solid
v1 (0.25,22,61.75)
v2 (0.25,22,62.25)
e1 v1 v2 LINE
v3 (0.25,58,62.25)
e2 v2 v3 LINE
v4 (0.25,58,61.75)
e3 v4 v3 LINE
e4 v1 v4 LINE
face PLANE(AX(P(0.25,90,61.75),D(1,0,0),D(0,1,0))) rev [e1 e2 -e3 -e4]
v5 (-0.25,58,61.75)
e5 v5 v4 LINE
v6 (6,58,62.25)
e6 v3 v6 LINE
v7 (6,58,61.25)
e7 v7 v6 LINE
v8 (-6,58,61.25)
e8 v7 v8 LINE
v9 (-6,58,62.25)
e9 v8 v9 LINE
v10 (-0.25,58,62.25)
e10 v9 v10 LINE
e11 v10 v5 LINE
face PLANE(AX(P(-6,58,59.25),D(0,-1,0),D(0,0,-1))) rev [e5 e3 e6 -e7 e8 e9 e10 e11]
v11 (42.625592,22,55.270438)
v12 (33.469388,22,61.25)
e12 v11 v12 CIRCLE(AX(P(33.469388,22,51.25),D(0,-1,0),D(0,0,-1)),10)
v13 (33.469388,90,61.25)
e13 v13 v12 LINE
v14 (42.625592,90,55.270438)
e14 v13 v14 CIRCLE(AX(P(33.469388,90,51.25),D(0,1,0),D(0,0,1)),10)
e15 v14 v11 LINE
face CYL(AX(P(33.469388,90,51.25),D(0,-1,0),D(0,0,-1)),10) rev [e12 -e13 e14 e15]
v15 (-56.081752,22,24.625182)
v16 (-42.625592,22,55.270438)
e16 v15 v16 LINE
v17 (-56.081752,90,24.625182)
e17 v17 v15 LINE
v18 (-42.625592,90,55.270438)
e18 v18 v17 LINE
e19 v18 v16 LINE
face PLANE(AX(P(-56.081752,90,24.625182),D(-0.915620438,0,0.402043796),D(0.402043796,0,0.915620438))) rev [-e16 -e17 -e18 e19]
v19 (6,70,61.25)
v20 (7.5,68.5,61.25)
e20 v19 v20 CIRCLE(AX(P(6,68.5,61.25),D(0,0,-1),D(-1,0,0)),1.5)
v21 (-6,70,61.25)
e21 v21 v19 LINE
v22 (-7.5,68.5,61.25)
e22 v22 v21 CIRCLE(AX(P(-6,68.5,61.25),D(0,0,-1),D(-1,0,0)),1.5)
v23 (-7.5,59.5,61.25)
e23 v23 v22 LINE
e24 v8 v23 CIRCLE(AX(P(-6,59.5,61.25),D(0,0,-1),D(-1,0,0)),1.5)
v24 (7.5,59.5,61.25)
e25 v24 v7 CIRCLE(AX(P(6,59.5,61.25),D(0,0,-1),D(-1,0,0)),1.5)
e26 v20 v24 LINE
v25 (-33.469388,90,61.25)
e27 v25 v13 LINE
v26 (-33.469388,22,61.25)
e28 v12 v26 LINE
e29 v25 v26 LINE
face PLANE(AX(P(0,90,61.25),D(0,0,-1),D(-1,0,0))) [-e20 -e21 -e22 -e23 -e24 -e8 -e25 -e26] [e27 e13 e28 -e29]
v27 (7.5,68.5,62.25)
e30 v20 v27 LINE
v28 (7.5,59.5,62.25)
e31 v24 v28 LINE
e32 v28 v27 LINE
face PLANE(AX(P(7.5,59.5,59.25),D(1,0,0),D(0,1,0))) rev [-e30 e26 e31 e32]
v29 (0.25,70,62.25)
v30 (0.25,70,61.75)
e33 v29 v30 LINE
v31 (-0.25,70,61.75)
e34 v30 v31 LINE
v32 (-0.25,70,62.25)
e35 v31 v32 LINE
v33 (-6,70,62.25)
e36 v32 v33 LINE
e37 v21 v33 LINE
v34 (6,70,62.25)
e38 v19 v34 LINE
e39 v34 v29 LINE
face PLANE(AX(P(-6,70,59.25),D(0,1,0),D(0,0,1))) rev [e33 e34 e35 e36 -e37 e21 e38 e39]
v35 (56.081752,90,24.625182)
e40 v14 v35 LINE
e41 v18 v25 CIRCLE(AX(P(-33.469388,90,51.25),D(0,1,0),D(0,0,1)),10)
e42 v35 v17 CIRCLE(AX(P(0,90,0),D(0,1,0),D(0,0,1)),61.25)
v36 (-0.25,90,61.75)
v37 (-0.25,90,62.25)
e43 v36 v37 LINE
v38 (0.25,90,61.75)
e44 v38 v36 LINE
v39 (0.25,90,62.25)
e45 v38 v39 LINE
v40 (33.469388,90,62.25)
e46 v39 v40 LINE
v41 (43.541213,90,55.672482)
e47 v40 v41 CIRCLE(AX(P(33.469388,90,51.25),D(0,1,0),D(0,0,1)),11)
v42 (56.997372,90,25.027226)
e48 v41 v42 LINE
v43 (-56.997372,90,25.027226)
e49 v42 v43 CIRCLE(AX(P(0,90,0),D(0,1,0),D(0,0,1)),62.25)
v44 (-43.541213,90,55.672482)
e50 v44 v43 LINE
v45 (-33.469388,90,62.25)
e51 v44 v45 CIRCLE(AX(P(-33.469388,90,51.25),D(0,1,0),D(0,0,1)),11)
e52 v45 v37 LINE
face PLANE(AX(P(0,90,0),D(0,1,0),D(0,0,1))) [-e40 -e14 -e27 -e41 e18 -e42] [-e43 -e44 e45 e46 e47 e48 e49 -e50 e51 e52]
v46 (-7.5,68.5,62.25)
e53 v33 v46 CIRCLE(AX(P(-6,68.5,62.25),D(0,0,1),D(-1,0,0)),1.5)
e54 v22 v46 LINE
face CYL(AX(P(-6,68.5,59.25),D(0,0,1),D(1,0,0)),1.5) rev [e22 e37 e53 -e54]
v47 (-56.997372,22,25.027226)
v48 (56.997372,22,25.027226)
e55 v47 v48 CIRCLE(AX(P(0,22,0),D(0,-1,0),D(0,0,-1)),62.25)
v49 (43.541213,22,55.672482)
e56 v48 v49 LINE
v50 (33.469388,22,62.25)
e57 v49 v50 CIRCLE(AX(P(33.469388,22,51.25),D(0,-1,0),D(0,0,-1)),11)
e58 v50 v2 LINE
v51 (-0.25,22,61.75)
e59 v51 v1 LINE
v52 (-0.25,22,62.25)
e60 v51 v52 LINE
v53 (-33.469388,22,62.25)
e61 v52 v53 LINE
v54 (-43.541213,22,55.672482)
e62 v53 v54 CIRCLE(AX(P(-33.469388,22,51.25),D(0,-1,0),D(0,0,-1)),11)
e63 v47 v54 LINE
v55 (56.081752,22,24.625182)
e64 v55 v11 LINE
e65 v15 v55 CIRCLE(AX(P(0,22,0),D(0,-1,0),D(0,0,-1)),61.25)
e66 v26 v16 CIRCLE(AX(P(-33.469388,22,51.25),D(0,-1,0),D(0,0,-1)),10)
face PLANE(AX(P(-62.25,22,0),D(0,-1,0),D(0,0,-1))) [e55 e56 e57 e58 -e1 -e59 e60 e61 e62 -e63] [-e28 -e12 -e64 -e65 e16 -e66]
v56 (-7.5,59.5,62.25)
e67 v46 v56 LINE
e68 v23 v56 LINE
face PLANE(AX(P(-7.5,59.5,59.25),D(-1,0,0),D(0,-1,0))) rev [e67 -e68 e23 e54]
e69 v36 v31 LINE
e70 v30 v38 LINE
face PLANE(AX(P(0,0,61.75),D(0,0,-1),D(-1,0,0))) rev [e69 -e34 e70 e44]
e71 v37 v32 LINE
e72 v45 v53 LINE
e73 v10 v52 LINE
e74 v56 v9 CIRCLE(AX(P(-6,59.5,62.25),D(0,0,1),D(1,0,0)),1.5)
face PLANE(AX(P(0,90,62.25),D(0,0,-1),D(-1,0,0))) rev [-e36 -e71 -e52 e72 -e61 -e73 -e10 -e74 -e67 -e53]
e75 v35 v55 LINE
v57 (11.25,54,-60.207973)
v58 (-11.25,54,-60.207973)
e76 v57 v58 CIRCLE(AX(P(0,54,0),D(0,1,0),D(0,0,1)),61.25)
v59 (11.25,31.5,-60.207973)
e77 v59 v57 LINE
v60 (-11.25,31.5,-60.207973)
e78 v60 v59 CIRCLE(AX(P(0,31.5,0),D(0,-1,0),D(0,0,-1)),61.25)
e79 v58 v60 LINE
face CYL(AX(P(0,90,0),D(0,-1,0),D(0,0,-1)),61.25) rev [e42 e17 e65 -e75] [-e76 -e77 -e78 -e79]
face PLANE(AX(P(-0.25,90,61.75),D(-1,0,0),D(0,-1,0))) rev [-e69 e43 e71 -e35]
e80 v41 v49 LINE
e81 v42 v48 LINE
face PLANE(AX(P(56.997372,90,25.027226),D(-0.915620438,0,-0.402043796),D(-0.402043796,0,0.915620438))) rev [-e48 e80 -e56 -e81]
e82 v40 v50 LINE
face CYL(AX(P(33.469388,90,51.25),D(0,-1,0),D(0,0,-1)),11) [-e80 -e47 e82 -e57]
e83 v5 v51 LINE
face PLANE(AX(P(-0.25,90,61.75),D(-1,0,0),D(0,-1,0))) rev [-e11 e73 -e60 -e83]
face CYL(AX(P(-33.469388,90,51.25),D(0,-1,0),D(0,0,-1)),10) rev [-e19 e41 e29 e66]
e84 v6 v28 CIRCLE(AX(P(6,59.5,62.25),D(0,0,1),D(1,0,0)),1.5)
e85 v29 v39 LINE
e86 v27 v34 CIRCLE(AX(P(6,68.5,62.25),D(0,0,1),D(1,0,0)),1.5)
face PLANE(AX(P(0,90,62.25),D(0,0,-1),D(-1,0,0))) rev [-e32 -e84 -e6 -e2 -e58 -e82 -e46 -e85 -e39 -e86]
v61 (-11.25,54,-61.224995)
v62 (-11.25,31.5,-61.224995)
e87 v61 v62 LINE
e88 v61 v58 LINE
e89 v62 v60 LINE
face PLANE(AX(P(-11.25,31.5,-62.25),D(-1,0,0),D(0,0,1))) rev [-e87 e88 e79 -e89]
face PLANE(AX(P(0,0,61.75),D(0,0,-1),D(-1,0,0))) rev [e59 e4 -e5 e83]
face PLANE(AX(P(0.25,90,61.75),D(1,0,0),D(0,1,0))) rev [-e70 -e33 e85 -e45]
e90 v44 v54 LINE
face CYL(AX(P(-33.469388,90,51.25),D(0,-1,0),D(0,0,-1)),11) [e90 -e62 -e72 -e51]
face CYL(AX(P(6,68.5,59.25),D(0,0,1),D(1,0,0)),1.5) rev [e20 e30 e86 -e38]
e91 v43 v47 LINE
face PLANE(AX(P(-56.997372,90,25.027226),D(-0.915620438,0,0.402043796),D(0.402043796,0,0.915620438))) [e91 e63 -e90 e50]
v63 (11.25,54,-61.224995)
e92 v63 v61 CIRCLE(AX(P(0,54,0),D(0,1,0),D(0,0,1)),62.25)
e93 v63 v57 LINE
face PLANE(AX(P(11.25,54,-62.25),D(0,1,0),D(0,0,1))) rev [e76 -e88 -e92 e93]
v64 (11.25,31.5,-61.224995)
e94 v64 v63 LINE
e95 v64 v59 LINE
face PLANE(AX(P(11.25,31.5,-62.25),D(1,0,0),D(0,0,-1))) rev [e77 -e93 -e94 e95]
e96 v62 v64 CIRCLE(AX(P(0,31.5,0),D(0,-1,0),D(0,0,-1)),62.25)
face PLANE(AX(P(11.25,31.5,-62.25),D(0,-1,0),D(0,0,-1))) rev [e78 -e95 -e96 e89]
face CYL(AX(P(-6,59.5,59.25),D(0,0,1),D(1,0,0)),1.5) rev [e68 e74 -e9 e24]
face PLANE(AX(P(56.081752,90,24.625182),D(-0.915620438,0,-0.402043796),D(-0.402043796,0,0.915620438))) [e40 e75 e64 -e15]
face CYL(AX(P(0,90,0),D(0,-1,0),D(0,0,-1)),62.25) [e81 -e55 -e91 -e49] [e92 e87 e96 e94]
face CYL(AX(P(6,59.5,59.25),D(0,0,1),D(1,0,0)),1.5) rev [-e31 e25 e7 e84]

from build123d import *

# Parameters (mm, degrees)
BOSS_EXTRUDE1_DEPTH = 90
CUT_EXTRUDE1_DEPTH  = 22
SKETCH4_W           = 22.5
SKETCH4_H           = 22.5
CUT_EXTRUDE3_DEPTH  = 126.897279558
CUT_EXTRUDE4_DEPTH  = 3
SKETCH6_W           = 0.5
SKETCH6_H           = 68
CUT_EXTRUDE5_DEPTH  = 0.5


# Read off the part's stored shape, not the designer's step: Cut-Extrude1
with BuildPart() as part:
    # Sketch1 → Boss-Extrude1 (new body)
    with BuildSketch(Plane(origin=(0, 0, 0), x_dir=(1, 0, 0), z_dir=(0, 1, 0))):
        with BuildLine():
            ThreePointArc((33.469387755, -62.25), (39.484065665, -60.45997555), (43.541212573, -55.672481752))
            Line((43.541212573, -55.672481752), (56.997372263, -25.027226277))
            ThreePointArc((56.997372263, -25.027226277), (0, 62.25), (-56.997372263, -25.027226277))
            Line((-56.997372263, -25.027226277), (-43.541212573, -55.672481752))
            ThreePointArc((-43.541212573, -55.672481752), (-39.484065665, -60.45997555), (-33.469387755, -62.25))
            Line((-33.469387755, -62.25), (33.469387755, -62.25))
        make_face()
        with BuildLine():
            Line((-9.5e-08, -61.25), (-33.469387755, -61.25))
            ThreePointArc((-33.469387755, -61.25), (-38.937276764, -59.622705046), (-42.625592135, -55.270437956))
            Line((-42.625592135, -55.270437956), (-56.081751825, -24.625182482))
            ThreePointArc((-56.081751825, -24.625182482), (-12.580842594, 59.944014711), (61.25, 0))
            ThreePointArc((61.25, 0), (59.944014711, -12.580842594), (56.081751825, -24.625182482))
            Line((56.081751825, -24.625182482), (42.625592135, -55.270437956))
            ThreePointArc((42.625592135, -55.270437956), (38.937276764, -59.622705046), (33.469387755, -61.25))
            Line((33.469387755, -61.25), (-9.5e-08, -61.25))
        make_face(mode=Mode.SUBTRACT)
    extrude(amount=BOSS_EXTRUDE1_DEPTH)

    # Cut-Extrude1 outline → Cut-Extrude1 (cut)
    with BuildSketch(Plane(origin=(0, 0, 0), x_dir=(1, 0, 0), z_dir=(0, 1, 0))):
        with BuildLine():
            Line((43.541212573, -55.672481752), (56.997372263, -25.027226277))
            ThreePointArc((56.997372263, -25.027226277), (0, 62.25), (-56.997372263, -25.027226277))
            Line((-56.997372263, -25.027226277), (-43.541212573, -55.672481752))
            ThreePointArc((-43.541212573, -55.672481752), (-39.484065665, -60.45997555), (-33.469387755, -62.25))
            Line((-33.469387755, -62.25), (33.469387755, -62.25))
            ThreePointArc((33.469387755, -62.25), (39.484065665, -60.45997555), (43.541212573, -55.672481752))
        make_face()
        with BuildLine():
            Line((33.469387755, -61.25), (-33.469387755, -61.25))
            ThreePointArc((-33.469387755, -61.25), (-38.937276765, -59.622705046), (-42.625592135, -55.270437956))
            Line((-42.625592135, -55.270437956), (-56.081751825, -24.625182482))
            ThreePointArc((-56.081751825, -24.625182482), (0, 61.25), (56.081751825, -24.625182482))
            Line((56.081751825, -24.625182482), (42.625592135, -55.270437956))
            ThreePointArc((42.625592135, -55.270437956), (38.937276765, -59.622705046), (33.469387755, -61.25))
        make_face(mode=Mode.SUBTRACT)
    extrude(amount=CUT_EXTRUDE1_DEPTH, mode=Mode.SUBTRACT)

    # Sketch4 → Cut-Extrude3 (cut, through all)
    with BuildSketch(Plane.XY):
        with Locations((0, 42.75)):
            Rectangle(SKETCH4_W, SKETCH4_H)
    extrude(amount=-CUT_EXTRUDE3_DEPTH, mode=Mode.SUBTRACT)

    # Sketch5 → Cut-Extrude4 (cut)
    with BuildSketch(Plane.XY.offset(62.25)):
        with BuildLine():
            Line((-6, 58), (6, 58))
            ThreePointArc((6, 58), (7.060660172, 58.439339828), (7.5, 59.5))
            Line((7.5, 59.5), (7.5, 68.5))
            ThreePointArc((7.5, 68.5), (7.060660172, 69.560660172), (6, 70))
            Line((6, 70), (-6, 70))
            ThreePointArc((-6, 70), (-7.060660172, 69.560660172), (-7.5, 68.5))
            Line((-7.5, 68.5), (-7.5, 59.5))
            ThreePointArc((-7.5, 59.5), (-7.060660172, 58.439339828), (-6, 58))
        make_face()
    extrude(amount=-CUT_EXTRUDE4_DEPTH, mode=Mode.SUBTRACT)

    # Sketch6 → Cut-Extrude5 (cut)
    with BuildSketch(Plane.XY.offset(62.25)):
        with Locations((0, 56)):
            Rectangle(SKETCH6_W, SKETCH6_H)
    extrude(amount=-CUT_EXTRUDE5_DEPTH, mode=Mode.SUBTRACT)


solid = part.part
